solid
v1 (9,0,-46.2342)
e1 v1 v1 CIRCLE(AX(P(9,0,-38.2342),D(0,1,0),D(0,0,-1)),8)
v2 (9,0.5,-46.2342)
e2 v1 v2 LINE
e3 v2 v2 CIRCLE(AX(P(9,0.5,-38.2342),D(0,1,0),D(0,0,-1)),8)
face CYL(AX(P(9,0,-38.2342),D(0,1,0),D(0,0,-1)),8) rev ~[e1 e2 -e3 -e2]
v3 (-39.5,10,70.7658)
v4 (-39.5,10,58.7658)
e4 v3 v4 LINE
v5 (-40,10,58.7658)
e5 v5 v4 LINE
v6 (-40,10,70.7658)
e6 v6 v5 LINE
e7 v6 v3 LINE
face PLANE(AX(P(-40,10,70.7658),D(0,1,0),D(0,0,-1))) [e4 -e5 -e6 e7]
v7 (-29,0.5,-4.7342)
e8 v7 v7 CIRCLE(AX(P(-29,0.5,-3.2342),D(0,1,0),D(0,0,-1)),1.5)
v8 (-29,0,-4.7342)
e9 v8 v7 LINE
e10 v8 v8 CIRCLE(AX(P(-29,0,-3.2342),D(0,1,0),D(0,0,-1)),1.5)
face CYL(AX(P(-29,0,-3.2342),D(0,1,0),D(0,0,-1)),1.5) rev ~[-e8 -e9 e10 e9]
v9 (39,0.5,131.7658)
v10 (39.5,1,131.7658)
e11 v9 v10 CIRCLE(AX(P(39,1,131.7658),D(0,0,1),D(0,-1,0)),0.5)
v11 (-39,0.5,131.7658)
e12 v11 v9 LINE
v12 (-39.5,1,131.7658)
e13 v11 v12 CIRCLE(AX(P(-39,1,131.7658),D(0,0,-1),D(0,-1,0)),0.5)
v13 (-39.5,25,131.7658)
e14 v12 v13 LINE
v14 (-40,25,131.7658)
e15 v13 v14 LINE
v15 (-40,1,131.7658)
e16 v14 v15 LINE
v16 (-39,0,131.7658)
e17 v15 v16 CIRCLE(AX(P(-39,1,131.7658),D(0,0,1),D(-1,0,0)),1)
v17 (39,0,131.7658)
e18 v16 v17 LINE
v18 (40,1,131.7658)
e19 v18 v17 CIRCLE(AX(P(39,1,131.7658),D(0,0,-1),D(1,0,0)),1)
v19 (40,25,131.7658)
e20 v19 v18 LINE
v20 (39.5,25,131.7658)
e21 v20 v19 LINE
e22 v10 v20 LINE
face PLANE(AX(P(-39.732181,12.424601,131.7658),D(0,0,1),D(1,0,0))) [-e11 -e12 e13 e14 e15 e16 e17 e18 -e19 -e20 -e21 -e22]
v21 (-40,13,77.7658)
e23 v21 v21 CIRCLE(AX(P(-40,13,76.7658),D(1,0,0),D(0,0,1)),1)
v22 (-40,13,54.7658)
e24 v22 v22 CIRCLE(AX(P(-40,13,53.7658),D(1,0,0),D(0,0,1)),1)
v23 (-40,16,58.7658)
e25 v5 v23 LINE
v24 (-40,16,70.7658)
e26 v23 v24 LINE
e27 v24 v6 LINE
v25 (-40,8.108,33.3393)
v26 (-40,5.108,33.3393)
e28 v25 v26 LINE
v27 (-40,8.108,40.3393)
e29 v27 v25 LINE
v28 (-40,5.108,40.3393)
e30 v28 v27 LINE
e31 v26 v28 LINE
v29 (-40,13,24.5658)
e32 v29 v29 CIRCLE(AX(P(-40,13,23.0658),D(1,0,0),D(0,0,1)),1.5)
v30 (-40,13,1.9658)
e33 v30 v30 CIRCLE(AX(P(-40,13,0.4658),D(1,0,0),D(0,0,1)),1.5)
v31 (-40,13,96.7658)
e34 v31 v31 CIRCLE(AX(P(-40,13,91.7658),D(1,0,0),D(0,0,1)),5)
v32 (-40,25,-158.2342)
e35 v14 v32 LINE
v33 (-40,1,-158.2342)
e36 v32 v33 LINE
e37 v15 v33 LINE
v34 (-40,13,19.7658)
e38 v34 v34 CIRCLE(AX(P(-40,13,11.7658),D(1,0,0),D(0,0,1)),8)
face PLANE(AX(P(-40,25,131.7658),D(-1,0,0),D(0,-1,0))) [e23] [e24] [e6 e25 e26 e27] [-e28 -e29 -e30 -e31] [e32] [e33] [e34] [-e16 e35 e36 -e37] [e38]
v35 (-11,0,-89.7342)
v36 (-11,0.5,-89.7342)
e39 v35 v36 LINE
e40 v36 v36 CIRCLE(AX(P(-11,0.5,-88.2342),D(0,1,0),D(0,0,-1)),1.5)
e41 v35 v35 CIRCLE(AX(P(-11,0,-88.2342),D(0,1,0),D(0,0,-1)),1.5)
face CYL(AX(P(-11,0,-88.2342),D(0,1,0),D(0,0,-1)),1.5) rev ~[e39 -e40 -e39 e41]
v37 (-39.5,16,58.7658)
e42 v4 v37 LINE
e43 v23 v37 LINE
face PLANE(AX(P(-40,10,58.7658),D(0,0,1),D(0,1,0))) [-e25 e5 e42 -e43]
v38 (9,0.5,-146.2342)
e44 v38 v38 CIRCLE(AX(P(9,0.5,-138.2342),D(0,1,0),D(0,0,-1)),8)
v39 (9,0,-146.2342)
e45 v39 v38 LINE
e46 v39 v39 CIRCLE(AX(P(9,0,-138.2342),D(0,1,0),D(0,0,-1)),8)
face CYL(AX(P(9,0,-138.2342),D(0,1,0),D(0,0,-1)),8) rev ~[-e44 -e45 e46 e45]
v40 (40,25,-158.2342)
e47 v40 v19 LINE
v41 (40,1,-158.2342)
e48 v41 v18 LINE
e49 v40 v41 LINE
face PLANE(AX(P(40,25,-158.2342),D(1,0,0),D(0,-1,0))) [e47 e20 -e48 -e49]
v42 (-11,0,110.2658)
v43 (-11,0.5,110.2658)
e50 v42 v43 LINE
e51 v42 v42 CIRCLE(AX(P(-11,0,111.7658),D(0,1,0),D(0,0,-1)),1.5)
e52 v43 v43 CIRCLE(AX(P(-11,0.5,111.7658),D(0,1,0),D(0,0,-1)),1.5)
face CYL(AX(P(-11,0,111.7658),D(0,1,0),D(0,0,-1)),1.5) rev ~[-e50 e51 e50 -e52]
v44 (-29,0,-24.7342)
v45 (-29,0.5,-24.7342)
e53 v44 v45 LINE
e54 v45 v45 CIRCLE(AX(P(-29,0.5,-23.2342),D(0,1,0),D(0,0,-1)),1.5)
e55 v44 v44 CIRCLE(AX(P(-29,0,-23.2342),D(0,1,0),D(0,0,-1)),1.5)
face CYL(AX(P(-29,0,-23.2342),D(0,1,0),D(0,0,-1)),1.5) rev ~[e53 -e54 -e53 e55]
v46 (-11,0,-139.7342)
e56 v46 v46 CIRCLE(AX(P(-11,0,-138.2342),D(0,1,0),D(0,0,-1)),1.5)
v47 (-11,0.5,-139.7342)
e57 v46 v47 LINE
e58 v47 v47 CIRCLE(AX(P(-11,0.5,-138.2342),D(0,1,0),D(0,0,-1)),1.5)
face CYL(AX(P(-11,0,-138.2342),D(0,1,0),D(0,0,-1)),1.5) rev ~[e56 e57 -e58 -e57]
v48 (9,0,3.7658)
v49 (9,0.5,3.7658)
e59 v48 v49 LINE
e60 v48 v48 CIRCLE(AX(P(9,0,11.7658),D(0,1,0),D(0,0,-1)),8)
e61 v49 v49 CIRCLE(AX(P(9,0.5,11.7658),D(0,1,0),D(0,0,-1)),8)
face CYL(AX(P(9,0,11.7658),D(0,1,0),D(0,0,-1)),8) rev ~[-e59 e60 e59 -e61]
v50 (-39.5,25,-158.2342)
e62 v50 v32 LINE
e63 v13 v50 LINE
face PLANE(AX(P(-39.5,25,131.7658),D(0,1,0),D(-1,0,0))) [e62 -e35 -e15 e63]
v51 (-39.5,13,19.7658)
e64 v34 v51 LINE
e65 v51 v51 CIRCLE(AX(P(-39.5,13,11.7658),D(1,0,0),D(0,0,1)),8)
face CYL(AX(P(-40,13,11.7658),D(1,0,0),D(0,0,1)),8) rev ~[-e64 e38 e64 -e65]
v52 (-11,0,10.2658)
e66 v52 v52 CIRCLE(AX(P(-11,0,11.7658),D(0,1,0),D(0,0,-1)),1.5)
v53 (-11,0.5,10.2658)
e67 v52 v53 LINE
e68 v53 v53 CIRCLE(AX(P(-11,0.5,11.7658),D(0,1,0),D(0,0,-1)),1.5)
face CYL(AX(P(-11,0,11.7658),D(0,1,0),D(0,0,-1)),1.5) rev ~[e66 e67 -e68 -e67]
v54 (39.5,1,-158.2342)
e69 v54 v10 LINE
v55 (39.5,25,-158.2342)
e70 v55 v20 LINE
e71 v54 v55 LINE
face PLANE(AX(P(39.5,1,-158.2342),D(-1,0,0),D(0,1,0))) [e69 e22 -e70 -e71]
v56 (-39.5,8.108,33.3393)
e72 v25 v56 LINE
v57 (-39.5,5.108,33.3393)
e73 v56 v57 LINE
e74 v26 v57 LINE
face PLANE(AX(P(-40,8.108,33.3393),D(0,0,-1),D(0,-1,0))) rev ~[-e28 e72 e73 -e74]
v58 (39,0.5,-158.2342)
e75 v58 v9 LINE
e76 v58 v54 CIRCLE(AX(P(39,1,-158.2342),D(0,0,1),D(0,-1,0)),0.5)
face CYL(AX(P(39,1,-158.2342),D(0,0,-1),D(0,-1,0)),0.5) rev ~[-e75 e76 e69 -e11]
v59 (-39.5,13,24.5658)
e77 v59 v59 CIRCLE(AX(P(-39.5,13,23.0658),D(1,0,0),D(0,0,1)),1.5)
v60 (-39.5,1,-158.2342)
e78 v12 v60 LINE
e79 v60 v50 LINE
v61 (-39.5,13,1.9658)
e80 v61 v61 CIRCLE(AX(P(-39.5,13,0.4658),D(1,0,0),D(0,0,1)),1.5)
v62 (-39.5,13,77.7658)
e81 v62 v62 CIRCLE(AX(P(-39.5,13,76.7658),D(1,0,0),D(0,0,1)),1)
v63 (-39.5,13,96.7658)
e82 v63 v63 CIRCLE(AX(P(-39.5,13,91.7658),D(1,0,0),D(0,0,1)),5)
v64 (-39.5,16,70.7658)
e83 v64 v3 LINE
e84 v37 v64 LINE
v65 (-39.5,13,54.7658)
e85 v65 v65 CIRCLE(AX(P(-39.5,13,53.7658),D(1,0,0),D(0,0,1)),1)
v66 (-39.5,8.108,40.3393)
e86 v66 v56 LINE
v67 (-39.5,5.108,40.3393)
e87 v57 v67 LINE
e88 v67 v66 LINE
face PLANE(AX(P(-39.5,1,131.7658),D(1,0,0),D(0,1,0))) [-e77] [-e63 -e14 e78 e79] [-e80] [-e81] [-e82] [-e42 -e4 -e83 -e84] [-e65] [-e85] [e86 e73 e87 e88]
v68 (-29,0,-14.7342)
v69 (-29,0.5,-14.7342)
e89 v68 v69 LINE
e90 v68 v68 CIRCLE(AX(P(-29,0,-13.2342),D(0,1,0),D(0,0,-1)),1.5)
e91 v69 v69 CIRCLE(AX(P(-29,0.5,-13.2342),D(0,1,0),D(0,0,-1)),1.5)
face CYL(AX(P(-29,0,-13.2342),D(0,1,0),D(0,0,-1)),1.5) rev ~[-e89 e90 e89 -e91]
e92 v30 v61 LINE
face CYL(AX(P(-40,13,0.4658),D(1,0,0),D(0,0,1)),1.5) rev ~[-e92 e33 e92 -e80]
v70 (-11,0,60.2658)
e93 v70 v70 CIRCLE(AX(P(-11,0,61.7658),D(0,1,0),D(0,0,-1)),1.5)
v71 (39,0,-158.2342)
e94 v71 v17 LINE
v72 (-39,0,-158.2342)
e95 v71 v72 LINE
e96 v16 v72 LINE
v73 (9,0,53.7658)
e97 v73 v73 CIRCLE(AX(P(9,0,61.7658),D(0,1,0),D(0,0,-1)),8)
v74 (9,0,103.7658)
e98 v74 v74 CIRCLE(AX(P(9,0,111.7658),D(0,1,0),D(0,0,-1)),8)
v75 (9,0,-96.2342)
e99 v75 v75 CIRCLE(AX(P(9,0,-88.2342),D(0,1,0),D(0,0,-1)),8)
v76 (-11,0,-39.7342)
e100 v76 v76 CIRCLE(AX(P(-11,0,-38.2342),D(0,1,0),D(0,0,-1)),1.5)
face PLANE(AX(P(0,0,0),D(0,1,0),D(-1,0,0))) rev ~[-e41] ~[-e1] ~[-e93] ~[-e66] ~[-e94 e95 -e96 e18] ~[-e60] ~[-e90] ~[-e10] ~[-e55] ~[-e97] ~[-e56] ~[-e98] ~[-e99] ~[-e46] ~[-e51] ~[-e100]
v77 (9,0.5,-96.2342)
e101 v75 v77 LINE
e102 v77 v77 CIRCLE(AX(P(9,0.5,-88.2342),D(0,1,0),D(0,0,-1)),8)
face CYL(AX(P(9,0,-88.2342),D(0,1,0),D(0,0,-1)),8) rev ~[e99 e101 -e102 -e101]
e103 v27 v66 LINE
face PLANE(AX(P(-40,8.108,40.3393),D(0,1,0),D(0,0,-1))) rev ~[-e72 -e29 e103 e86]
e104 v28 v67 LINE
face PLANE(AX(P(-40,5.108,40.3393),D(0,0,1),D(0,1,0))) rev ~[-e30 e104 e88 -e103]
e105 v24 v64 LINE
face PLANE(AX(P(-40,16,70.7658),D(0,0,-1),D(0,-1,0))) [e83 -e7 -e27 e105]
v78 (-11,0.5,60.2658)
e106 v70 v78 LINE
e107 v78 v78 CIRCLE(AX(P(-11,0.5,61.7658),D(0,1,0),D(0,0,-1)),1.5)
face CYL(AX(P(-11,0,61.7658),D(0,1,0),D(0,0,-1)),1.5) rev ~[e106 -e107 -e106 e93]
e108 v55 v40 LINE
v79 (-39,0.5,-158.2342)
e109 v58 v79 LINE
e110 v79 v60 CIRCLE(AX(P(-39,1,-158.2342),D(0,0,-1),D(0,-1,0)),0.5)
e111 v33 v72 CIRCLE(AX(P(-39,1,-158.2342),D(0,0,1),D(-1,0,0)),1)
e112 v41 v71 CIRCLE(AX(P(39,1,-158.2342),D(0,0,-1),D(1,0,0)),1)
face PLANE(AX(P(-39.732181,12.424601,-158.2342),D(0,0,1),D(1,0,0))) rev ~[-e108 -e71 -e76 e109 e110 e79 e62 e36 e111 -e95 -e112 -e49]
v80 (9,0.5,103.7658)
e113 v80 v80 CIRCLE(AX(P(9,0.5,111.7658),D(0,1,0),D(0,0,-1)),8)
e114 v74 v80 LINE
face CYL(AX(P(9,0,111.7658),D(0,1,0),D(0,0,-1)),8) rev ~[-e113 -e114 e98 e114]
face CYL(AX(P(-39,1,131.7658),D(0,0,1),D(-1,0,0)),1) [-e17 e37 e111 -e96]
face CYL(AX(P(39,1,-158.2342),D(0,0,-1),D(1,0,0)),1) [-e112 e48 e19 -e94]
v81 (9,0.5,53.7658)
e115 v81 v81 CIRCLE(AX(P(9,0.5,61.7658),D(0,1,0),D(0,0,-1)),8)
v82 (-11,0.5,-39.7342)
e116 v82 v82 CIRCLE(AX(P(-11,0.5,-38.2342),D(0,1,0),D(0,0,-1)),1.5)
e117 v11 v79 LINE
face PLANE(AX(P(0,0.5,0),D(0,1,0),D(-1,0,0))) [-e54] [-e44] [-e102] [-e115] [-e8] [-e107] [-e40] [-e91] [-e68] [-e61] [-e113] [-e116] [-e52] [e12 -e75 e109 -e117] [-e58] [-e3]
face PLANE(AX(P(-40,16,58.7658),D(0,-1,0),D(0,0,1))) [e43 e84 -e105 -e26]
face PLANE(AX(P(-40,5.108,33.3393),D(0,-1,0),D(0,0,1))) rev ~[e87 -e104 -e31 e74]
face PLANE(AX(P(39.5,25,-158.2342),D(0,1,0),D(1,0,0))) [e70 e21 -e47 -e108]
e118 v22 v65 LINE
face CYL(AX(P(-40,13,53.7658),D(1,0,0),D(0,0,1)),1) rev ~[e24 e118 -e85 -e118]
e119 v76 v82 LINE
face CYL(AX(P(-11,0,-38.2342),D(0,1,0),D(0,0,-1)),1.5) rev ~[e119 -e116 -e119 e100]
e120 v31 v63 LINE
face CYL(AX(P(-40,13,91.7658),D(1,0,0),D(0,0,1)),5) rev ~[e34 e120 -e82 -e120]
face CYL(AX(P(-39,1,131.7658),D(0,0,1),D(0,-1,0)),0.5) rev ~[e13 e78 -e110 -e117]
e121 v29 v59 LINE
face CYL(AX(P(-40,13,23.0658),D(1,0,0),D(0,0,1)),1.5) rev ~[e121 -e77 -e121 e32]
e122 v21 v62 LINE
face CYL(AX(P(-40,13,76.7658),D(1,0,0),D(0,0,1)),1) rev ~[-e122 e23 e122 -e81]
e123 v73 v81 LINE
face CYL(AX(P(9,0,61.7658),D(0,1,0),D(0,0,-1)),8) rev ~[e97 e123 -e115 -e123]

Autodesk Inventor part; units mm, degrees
ref_plane "YZ Plane" through (0, 0, 0) normal (1, 0, 0) x (0, 1, 0)
ref_plane "XZ Plane" through (0, 0, 0) normal (0, 1, 0) x (-1, 0, 0)
ref_plane "XY Plane" through (0, 0, 0) normal (0, 0, 1) x (1, 0, 0)
sketch "Sketch1" plane through (0, 0, 0) normal (0, 1, 0) x (-1, 0, 0)
  line L0 (40, 131.7658) -> (-40, 131.7658)
  line L1 (-40, 131.7658) -> (-40, -158.2342)
  line L2 (-40, -158.2342) -> (40, -158.2342)
  line L3 (40, -158.2342) -> (40, 131.7658)
  point P0 (0, 0)
  dimension "d0" = 80
  dimension "d1" = 290
extrude "Plate1" add sketch "Sketch1" along normal blind 0.5
sketch "Sketch2" plane through (39.5, 0, -158.2342) normal (1, 0, 0) x (0, 1, 0)
  line L0 (0, 290) -> (0, 0)
  line L1 (0, 0) -> (25, 0)
  line L2 (25, 0) -> (25, 290)
  line L3 (25, 290) -> (0, 290)
edge flange "Flange1" height 25 angle 90 thickness 0.5 bend radius 0.5 thickness toward (1, 0, 0) relief tear relief width 0.5 relief depth 0.25 edges at (40, 0.5, -13.2342) wall of the first edge with corners at (39.5, 0, 131.7658) (39.5, 0, -158.2342) (39.5, 25, -158.2342) (39.5, 25, 131.7658)
bend "Bend1"
corner "Corner1"
sketch "Sketch3" plane through (-39.5, 0, 131.7658) normal (-1, 0, 0) x (0, -1, 0)
  line L0 (0, -290) -> (0, 0)
  line L1 (0, 0) -> (-25, 0)
  line L2 (-25, 0) -> (-25, -290)
  line L3 (-25, -290) -> (0, -290)
edge flange "Flange2" height 25 angle 90 thickness 0.5 bend radius 0.5 thickness toward (-1, 0, 0) relief tear relief width 0.5 relief depth 0.25 edges at (-40, 0.5, -13.2342) wall of the first edge with corners at (-39.5, 0, -158.2342) (-39.5, 0, 131.7658) (-39.5, 25, 131.7658) (-39.5, 25, -158.2342)
bend "Bend2"
corner "Corner2"
hole "Hole1" at (9, 0, -138.2342) direction (0, 1, 0) diameter 16 depth 0.5 tip angle 118
hole "Hole2" at (9, 0, -88.2342) direction (0, 1, 0) diameter 16 depth 0.5 tip angle 118
hole "Hole3" at (9, 0, -38.2342) direction (0, 1, 0) diameter 16 depth 0.5 tip angle 118
hole "Hole4" at (9, 0, 11.7658) direction (0, 1, 0) diameter 16 depth 0.5 tip angle 118
hole "Hole5" at (9, 0, 61.7658) direction (0, 1, 0) diameter 16 depth 0.5 tip angle 118
hole "Hole6" at (9, 0, 111.7658) direction (0, 1, 0) diameter 16 depth 0.5 tip angle 118
hole "Hole7" at (-11, 0, -138.2342) direction (0, 1, 0) diameter 3 depth 0.5 tip angle 118
hole "Hole8" at (-11, 0, -88.2342) direction (0, 1, 0) diameter 3 depth 0.5 tip angle 118
hole "Hole9" at (-11, 0, -38.2342) direction (0, 1, 0) diameter 3 depth 0.5 tip angle 118
hole "Hole10" at (-11, 0, 11.7658) direction (0, 1, 0) diameter 3 depth 0.5 tip angle 118
hole "Hole11" at (-11, 0, 61.7658) direction (0, 1, 0) diameter 3 depth 0.5 tip angle 118
hole "Hole12" at (-11, 0, 111.7658) direction (0, 1, 0) diameter 3 depth 0.5 tip angle 118
hole "Hole13" at (-29, 0, -13.2342) direction (0, 1, 0) diameter 3 depth 0.5 tip angle 118
hole "Hole14" at (-29, 0, -23.2342) direction (0, 1, 0) diameter 3 depth 0.5 tip angle 118
hole "Hole15" at (-29, 0, -3.2342) direction (0, 1, 0) diameter 3 depth 0.5 tip angle 118
hole "Hole16" at (-40, 13, 91.7658) direction (1, 0, 0) diameter 10 depth 0.5 tip angle 118
hole "Hole17" at (-40, 13, 76.7658) direction (1, 0, 0) diameter 2 depth 0.5 tip angle 118
hole "Hole18" at (-40, 13, 53.7658) direction (1, 0, 0) diameter 2 depth 0.5 tip angle 118
sketch "Sketch4" plane through (-40, 25, -158.2342) normal (-1, 0, 0) x (0, 0, 1)
  line L0 (229, -15) -> (217, -15)
  line L1 (217, -15) -> (217, -9)
  line L2 (217, -9) -> (229, -9)
  line L3 (229, -9) -> (229, -15)
  line L4 (290, 0) -> (290, -24) projected
  point P0 (158.2342, -25)
  dimension "d185" = 61
  dimension "d186" = 73
extrude "Cut1" cut sketch "Sketch4" against normal blind 0.5
sketch "Sketch5" plane through (-40, 25, -158.2342) normal (-1, 0, 0) x (0, 0, 1)
  line L0 (198.5735, -16.892) -> (191.5735, -16.892)
  line L1 (191.5735, -16.892) -> (191.5735, -19.892)
  line L2 (191.5735, -19.892) -> (198.5735, -19.892)
  line L3 (198.5735, -19.892) -> (198.5735, -16.892)
  point P0 (158.2342, -25)
  dimension "d189" = 3
  dimension "d190" = 7
extrude "Cut2" cut sketch "Sketch5" against normal blind 0.5
hole "Hole19" at (-40, 13, 11.7658) direction (1, 0, 0) diameter 16 depth 0.5 tip angle 118
hole "Hole20" at (-40, 13, 23.0658) direction (1, 0, 0) diameter 3 depth 0.5 tip angle 118
hole "Hole21" at (-40, 13, 0.4658) direction (1, 0, 0) diameter 3 depth 0.5 tip angle 118
equation "\"d30\" = Thickness"
equation "\"d39\" = Thickness"
equation "\"d48\" = Thickness"
equation "\"d57\" = Thickness"
equation "\"d66\" = Thickness"
equation "\"d75\" = Thickness"
equation "\"d84\" = Thickness"
equation "\"d93\" = Thickness"
equation "\"d102\" = Thickness"
equation "\"d111\" = Thickness"
equation "\"d120\" = Thickness"
equation "\"d129\" = Thickness"
equation "\"d138\" = Thickness"
equation "\"d147\" = Thickness"
equation "\"d156\" = Thickness"
equation "\"d165\" = Thickness"
equation "\"d174\" = Thickness"
equation "\"d183\" = Thickness"
equation "\"d187\" = Thickness"
equation "\"d191\" = Thickness"
equation "\"d200\" = Thickness"
equation "\"d209\" = Thickness"
equation "\"d219\" = Thickness"
equation "\"d3\" = BendReliefWidth"
equation "\"d4\" = BendReliefDepth"
equation "\"d5\" = MinimumRemnant"
equation "\"d6\" = BendRadius"
equation "\"d9\" = BendRadius"
equation "\"d10\" = CornerReliefSize"
equation "\"d11\" = GapSize"
equation "\"d12\" = JacobiRadiusSize"
equation "\"d13\" = BendReliefWidth"
equation "\"d14\" = BendReliefDepth"
equation "\"d15\" = MinimumRemnant"
equation "\"d16\" = BendRadius"
equation "\"d19\" = BendRadius"
equation "\"d20\" = CornerReliefSize"
equation "\"d21\" = GapSize"
equation "\"d22\" = JacobiRadiusSize"
equation "\"BendRadius\" = Thickness"
equation "\"BendReliefWidth\" = Thickness"
equation "\"BendReliefDepth\" = 0.5 * Thickness"
equation "\"CornerReliefSize\" = 4 * Thickness"
equation "\"MinimumRemnant\" = 2 * Thickness"
equation "\"TransitionRadius\" = BendRadius"
equation "\"JacobiRadiusSize\" = BendRadius"
equation "\"GapSize\" = Thickness"
equation "\"d2\" = BendRadius"
equation "\"Thickness\" = 0.5"
properties part number "obudowa nowa"
